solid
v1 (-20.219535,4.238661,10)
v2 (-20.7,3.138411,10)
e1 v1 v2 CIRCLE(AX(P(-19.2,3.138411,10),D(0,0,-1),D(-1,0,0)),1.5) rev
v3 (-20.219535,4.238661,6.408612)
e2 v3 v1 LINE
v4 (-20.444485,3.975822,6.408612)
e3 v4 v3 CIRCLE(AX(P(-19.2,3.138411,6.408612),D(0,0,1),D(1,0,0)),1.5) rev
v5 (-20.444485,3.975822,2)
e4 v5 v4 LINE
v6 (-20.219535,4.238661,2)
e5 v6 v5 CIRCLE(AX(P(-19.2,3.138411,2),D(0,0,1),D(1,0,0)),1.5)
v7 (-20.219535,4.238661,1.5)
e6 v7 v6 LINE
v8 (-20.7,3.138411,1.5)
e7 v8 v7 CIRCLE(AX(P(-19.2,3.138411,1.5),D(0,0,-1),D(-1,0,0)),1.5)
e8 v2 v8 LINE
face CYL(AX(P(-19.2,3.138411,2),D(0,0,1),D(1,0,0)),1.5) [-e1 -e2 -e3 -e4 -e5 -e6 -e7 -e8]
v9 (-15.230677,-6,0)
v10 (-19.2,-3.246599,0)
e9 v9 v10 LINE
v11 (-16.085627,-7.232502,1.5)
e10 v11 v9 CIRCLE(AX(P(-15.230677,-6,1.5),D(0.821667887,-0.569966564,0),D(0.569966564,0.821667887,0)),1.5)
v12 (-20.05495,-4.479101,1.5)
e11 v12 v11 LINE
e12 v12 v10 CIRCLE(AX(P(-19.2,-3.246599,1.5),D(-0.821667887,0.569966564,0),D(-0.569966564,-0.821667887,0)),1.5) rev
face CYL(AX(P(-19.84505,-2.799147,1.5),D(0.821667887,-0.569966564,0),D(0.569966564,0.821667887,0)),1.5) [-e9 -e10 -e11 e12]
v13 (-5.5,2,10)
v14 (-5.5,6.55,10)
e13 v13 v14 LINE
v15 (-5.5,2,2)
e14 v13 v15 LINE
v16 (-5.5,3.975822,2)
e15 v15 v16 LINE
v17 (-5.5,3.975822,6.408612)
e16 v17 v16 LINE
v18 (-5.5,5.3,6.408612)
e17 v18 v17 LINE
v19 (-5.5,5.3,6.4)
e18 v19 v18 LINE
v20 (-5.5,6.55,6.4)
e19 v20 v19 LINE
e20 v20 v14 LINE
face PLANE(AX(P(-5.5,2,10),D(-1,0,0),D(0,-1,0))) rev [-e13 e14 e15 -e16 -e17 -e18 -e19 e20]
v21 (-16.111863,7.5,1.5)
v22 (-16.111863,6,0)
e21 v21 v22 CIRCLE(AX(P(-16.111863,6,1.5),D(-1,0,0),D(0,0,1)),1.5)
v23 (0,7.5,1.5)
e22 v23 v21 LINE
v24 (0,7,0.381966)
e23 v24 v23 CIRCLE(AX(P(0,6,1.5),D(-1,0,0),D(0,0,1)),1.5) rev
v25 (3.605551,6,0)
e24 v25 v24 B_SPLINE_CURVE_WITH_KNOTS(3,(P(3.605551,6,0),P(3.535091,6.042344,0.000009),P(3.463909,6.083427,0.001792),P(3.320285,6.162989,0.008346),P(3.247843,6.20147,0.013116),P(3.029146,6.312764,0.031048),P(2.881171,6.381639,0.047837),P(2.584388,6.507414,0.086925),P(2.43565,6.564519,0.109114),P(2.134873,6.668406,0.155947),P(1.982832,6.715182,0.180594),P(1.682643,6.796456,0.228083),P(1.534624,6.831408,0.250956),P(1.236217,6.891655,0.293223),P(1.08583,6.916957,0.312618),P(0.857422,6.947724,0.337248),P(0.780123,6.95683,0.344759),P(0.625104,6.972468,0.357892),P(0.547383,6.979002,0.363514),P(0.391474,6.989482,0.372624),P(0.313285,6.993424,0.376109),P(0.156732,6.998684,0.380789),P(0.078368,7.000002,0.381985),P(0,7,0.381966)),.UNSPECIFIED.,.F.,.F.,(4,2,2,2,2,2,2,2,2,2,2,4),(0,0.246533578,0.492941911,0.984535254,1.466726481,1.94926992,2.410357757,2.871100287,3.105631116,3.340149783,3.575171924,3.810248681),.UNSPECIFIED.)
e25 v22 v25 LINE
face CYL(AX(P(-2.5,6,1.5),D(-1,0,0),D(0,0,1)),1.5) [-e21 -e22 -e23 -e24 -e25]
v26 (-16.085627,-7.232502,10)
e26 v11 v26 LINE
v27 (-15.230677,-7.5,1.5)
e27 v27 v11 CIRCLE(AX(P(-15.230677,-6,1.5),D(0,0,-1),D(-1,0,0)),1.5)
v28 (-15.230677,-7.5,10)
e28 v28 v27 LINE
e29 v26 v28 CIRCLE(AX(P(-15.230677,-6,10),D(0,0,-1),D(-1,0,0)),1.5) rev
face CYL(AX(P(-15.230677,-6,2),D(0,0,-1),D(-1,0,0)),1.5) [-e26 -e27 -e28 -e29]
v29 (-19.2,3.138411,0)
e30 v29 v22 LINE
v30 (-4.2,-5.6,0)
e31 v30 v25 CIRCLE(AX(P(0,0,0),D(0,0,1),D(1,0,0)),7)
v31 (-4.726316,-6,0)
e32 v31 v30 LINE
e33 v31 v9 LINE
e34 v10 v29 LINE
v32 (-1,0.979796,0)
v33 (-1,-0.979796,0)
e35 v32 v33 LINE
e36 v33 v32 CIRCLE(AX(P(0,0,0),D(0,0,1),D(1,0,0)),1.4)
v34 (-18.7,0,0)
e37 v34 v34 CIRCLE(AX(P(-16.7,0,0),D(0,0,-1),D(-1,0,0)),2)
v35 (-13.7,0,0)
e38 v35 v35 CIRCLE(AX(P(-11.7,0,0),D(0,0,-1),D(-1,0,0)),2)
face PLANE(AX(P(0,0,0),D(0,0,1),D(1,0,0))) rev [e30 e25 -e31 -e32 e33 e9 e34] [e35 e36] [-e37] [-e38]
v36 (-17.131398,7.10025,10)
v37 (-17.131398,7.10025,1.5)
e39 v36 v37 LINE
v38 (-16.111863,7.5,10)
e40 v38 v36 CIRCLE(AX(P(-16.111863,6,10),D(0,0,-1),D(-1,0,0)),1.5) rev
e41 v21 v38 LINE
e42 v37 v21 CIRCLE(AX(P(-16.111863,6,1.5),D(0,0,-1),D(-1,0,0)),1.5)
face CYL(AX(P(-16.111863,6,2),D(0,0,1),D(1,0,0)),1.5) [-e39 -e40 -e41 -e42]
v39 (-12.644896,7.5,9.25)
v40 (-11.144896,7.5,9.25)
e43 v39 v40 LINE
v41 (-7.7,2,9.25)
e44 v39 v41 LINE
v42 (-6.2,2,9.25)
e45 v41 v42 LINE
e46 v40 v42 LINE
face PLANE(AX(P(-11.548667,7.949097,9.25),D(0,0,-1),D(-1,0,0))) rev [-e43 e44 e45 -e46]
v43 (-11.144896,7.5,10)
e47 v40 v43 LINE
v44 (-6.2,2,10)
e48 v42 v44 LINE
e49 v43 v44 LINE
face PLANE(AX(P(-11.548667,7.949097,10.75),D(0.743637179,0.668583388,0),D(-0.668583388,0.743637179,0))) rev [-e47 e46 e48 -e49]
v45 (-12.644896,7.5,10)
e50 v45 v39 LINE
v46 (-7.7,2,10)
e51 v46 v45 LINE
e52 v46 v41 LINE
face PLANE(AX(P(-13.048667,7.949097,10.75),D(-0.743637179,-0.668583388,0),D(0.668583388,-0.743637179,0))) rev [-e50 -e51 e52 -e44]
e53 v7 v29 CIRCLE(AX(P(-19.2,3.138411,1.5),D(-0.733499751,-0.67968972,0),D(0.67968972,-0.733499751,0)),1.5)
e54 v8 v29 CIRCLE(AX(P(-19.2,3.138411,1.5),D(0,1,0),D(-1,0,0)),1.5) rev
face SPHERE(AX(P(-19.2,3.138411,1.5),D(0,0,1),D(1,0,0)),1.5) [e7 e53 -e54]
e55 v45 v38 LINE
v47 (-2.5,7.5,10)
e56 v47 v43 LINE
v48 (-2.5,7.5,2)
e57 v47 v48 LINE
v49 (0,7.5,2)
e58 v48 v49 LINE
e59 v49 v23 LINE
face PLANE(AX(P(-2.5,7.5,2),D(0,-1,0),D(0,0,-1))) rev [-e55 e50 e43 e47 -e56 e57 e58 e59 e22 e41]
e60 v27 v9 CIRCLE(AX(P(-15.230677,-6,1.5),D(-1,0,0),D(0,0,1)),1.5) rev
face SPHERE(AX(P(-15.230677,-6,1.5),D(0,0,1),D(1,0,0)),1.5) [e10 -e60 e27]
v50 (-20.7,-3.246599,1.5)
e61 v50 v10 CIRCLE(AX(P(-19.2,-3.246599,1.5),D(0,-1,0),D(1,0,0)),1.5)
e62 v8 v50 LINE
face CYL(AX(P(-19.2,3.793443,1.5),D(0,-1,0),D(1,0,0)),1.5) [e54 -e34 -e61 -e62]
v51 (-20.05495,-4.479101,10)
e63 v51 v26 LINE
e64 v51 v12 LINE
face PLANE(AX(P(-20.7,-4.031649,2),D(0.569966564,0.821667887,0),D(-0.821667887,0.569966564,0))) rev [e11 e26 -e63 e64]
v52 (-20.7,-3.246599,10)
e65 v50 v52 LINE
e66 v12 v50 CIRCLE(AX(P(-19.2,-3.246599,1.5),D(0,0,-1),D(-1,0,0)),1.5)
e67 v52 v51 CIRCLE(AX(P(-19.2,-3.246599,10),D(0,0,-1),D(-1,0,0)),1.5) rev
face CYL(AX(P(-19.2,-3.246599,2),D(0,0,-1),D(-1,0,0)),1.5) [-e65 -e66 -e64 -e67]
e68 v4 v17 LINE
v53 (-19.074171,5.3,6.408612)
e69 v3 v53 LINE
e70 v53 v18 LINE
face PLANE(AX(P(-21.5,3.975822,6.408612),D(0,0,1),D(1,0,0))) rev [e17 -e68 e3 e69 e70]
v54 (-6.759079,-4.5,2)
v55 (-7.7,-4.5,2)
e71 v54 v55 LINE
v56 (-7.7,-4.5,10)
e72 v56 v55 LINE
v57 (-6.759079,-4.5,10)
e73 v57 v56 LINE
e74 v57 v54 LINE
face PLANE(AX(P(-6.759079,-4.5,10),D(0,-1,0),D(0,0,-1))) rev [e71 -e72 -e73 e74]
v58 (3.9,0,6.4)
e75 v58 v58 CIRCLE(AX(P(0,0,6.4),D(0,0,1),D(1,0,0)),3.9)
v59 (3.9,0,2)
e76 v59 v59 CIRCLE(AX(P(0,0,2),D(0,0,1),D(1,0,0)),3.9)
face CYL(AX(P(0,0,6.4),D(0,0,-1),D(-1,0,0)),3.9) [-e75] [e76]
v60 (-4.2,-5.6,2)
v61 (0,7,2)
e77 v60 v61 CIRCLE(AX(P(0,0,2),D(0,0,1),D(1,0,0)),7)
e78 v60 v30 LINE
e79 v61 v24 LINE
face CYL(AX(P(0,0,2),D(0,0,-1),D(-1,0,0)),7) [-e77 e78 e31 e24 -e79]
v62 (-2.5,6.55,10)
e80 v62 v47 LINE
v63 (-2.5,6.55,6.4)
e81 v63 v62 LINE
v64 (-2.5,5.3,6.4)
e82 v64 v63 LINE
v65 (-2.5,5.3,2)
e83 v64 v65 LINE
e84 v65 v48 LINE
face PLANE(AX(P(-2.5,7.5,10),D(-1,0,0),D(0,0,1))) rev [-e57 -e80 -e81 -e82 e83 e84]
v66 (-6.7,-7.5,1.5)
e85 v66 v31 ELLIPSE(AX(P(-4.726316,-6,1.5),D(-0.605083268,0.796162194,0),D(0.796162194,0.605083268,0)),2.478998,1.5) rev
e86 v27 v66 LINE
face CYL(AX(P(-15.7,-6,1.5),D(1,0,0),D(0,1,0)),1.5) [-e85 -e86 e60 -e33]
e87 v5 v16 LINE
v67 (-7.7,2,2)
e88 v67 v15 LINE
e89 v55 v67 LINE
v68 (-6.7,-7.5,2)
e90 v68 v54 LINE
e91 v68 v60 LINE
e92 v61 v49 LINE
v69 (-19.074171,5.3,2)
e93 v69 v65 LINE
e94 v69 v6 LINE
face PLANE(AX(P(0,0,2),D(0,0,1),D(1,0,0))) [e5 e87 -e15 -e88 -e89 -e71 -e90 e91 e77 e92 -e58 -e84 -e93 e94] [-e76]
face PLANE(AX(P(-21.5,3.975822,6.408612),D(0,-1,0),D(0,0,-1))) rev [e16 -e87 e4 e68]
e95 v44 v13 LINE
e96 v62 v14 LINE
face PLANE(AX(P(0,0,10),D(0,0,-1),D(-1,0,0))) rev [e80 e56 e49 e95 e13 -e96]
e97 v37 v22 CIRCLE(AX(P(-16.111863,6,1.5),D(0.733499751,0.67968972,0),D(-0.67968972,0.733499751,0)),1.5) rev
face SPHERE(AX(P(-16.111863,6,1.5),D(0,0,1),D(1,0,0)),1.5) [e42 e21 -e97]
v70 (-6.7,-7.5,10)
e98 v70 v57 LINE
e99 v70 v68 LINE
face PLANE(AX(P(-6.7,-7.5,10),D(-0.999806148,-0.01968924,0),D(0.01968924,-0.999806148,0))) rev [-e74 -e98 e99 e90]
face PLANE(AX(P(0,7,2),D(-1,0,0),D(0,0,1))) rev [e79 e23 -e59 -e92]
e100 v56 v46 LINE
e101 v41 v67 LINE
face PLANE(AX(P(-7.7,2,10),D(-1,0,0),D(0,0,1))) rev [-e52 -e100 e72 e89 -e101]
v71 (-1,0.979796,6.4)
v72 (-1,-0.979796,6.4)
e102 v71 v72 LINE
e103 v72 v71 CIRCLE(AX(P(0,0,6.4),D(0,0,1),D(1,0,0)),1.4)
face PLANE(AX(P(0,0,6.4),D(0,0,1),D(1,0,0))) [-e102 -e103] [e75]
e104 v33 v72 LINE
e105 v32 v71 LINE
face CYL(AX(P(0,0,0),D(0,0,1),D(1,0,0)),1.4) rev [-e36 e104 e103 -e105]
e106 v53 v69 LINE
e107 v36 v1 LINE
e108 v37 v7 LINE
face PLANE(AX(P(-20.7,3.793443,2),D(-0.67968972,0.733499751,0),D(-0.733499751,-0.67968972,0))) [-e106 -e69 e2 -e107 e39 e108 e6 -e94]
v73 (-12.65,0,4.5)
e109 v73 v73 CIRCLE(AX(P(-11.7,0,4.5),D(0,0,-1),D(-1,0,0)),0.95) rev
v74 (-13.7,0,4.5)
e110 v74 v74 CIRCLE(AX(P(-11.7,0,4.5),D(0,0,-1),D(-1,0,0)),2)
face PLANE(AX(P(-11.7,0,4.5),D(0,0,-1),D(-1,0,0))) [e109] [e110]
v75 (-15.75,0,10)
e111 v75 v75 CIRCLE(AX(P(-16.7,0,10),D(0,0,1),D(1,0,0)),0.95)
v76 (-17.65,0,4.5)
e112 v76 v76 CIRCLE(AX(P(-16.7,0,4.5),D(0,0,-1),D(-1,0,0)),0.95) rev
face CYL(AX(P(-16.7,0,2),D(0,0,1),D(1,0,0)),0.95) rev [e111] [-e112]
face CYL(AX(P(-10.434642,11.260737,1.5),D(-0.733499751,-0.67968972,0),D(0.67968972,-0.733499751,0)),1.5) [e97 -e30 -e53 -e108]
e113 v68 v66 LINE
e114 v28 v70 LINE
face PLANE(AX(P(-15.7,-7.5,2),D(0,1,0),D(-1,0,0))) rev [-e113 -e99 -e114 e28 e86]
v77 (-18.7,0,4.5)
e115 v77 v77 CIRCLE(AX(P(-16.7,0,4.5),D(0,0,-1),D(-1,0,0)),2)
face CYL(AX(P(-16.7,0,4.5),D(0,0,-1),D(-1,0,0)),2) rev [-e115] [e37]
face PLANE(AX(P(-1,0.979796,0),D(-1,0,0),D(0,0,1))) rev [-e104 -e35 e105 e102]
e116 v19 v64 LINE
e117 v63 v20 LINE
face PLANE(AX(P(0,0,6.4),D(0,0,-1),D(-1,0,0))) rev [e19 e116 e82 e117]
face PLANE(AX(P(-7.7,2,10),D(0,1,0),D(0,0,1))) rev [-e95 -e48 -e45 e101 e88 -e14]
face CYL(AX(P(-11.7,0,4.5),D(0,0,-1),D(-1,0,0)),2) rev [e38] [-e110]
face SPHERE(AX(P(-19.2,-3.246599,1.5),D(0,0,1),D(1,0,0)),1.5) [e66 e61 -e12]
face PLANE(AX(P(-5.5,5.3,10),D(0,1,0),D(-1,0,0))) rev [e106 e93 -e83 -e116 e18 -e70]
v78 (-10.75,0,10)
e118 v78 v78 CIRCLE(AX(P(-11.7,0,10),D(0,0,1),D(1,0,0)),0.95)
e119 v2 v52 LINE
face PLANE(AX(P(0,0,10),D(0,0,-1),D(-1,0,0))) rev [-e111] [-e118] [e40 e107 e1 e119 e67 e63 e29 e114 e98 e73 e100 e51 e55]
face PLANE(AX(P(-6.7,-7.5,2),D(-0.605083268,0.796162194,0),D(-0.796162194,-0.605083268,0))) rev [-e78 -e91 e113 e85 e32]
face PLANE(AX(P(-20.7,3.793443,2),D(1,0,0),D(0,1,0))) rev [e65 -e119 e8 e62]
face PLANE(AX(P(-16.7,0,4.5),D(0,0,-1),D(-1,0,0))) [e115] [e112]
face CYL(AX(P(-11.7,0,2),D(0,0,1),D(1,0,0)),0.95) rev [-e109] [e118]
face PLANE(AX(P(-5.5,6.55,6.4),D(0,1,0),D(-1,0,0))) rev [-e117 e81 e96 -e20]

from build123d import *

# Parameters (mm, degrees)
BOSS_EXTRUDE1_DEPTH = 2
BOSS_EXTRUDE2_DEPTH = 8
SKETCH24_R          = 3.9
BOSS_EXTRUDE5_DEPTH = 4.4
SKETCH30_W          = 4.40861202
SKETCH30_H          = 1.324178481
CUT_EXTRUDE12_DEPTH = 16
CUT_EXTRUDE11_DEPTH = 23.928148639
FILLET1_R           = 1.5
SKETCH34_W          = 1.5
SKETCH34_H          = 1.5
CUT_EXTRUDE13_DEPTH = 8
SKETCH36_R          = 0.95
CUT_EXTRUDE15_DEPTH = 8
SKETCH37_R          = 2
CUT_EXTRUDE16_DEPTH = 4.5
SKETCH38_W          = 3
SKETCH38_H          = 1.25
CUT_EXTRUDE17_DEPTH = 3.6


with BuildPart() as part:
    # Sketch2 → Boss-Extrude1 (new body)
    with BuildSketch(Plane.XY):
        with BuildLine():
            Line((-2.5, 7.5), (-16.7, 7.5))
            Line((-16.7, 7.5), (-20.7, 3.793442666))
            Line((-20.7, 3.793442666), (-20.7, -4.031648778))
            Line((-20.7, -4.031648778), (-15.7, -7.5))
            Line((-15.7, -7.5), (-6.7, -7.5))
            Line((-6.7, -7.5), (-4.2, -5.6))
            ThreePointArc((-4.2, -5.6), (3.130495168, -6.260990337), (7, 0))
            ThreePointArc((7, 0), (4.949747468, 4.949747468), (0, 7))
            Line((0, 7), (0, 7.5))
            Line((0, 7.5), (-2.5, 7.5))
        make_face()
    extrude(amount=BOSS_EXTRUDE1_DEPTH)

    # Sketch4 → Boss-Extrude2 (add)
    with BuildSketch(Plane.XY.offset(2)):
        Polygon((-15.7, -7.5), (-6.7, -7.5), (-6.759079174, -4.5), (-7.7, -4.5), (-7.7, 2), (-5.5, 2), (-5.5, 5.3), (-2.5, 5.3), (-2.5, 7.5), (-16.7, 7.5), (-20.7, 3.793442666), (-20.7, -4.031648778), align=None)
    extrude(amount=BOSS_EXTRUDE2_DEPTH)

    # Sketch24 → Boss-Extrude5 (add)
    with BuildSketch(Plane.XY.offset(2)):
        Circle(SKETCH24_R)
    extrude(amount=BOSS_EXTRUDE5_DEPTH)

    # Sketch30 → Cut-Extrude12 (cut)
    with BuildSketch(Plane(origin=(-5.5, 0, 0), x_dir=(0, 0, -1), z_dir=(1, 0, 0))):
        with Locations((-4.20430601, 4.63791076)):
            Rectangle(SKETCH30_W, SKETCH30_H)
    extrude(amount=-CUT_EXTRUDE12_DEPTH, mode=Mode.SUBTRACT)

    # Sketch28 → Cut-Extrude11 (cut, through all)
    with BuildSketch(Plane.XY.offset(6.4)):
        with BuildLine():
            Line((-1, 0.979795897), (-1, -0.979795897))
            ThreePointArc((-1, -0.979795897), (1.4, 0), (-1, 0.979795897))
        make_face()
    extrude(amount=-CUT_EXTRUDE11_DEPTH, mode=Mode.SUBTRACT)

    # Fillet1
    # the kernel refuses this fillet: 1.5 mm, written as the material it takes off along each edge
    with BuildSketch(Plane(origin=(-15.230677435, -6, 1.5), x_dir=(-0.5699665637840448, -0.8216678867816415, 0), z_dir=(0, 0, -1))) as fillet1_piece_1_section:
        Polygon((0, 0), (FILLET1_R * 1.02, 0), (FILLET1_R * 1.02, -FILLET1_R * 0.319139344377), (FILLET1_R * 0.838101244517, -FILLET1_R * 0.58136589506), align=None)
    fillet1_piece_1 = extrude(amount=FILLET1_R * 1.02, mode=Mode.PRIVATE)
    fillet1_piece_1 = fillet1_piece_1 - Plane(origin=(-15.230677435, -6, 1.5), x_dir=(0.29860685961507855, 0.9543762064253388, 0), z_dir=(0, 0, -1)) * Sphere(FILLET1_R, mode=Mode.PRIVATE)
    add(fillet1_piece_1, mode=Mode.SUBTRACT)
    with BuildSketch(Plane(origin=(-16.11186344, 6, 1.5), x_dir=(-0.6796897201843015, 0.7334997506991983, 0), z_dir=(0, 0, -1))) as fillet1_piece_2_section:
        Polygon((0, 0), (FILLET1_R * 1.02, 0), (FILLET1_R * 1.02, FILLET1_R * 0.399932860855), (FILLET1_R * 0.748169745713, FILLET1_R * 0.693283514588), align=None)
    fillet1_piece_2 = extrude(amount=FILLET1_R * 1.02, mode=Mode.PRIVATE)
    fillet1_piece_2 = fillet1_piece_2 - Plane(origin=(-16.11186344, 6, 1.5), x_dir=(0.3650344157067945, -0.9309940254102596, 0), z_dir=(0, 0, -1)) * Sphere(FILLET1_R, mode=Mode.PRIVATE)
    add(fillet1_piece_2, mode=Mode.SUBTRACT)
    with BuildSketch(Plane(origin=(-19.2, 3.138411196, 1.5), x_dir=(-0.6796897201843015, 0.7334997506991983, 0), z_dir=(0, 0, -1))) as fillet1_piece_3_section:
        Polygon((0, 0), (FILLET1_R * 1.02, 0), (FILLET1_R * 1.02, -FILLET1_R * 0.445421399395), (FILLET1_R * 0.693283514588, -FILLET1_R * 0.748169745713), align=None)
    fillet1_piece_3 = extrude(amount=FILLET1_R * 1.02, mode=Mode.PRIVATE)
    fillet1_piece_3 = fillet1_piece_3 - Plane(origin=(-19.2, 3.138411196, 1.5), x_dir=(0.9164304993244992, -0.40019387789901173, 0), z_dir=(0, 0, -1)) * Sphere(FILLET1_R, mode=Mode.PRIVATE)
    add(fillet1_piece_3, mode=Mode.SUBTRACT)
    with BuildSketch(Plane(origin=(-19.2, -3.246599046, 1.5), x_dir=(-0.5699665637840448, -0.8216678867816415, 0), z_dir=(0, 0, -1))) as fillet1_piece_4_section:
        Polygon((0, 0), (FILLET1_R * 1.02, 0), (FILLET1_R * 1.02, FILLET1_R * 0.533833817771), (FILLET1_R * 0.58136589506, FILLET1_R * 0.838101244517), align=None)
    fillet1_piece_4 = extrude(amount=FILLET1_R * 1.02, mode=Mode.PRIVATE)
    fillet1_piece_4 = fillet1_piece_4 - Plane(origin=(-19.2, -3.246599046, 1.5), x_dir=(0.8859928227090906, 0.46369895202380795, 0), z_dir=(0, 0, -1)) * Sphere(FILLET1_R, mode=Mode.PRIVATE)
    add(fillet1_piece_4, mode=Mode.SUBTRACT)
    with BuildSketch(Plane(origin=(-15.230677435, -7.5, 0), x_dir=(0, 1, 0), z_dir=(1, 0, 0))) as fillet1_piece_5_section:
        with BuildLine():
            CenterArc((FILLET1_R, FILLET1_R), FILLET1_R, 180, 90)
            Line((0, FILLET1_R), (0, 0))
            Line((0, 0), (FILLET1_R, 0))
        make_face()
    fillet1_piece_5 = extrude(amount=12.280677435, mode=Mode.PRIVATE)
    fillet1_piece_5 = split(fillet1_piece_5, bisect_by=Plane(origin=(-9.092127217, -9.318016685, 0.3282266), z_dir=(-0.6050832675335577, 0.7961621941231027, 0)), keep=Keep.TOP, mode=Mode.PRIVATE)
    add(fillet1_piece_5, mode=Mode.SUBTRACT)
    with BuildSketch(Plane(origin=(3.75, 7.5, 0), x_dir=(0, 0, 1), z_dir=(-1, 0, 0))) as fillet1_piece_6:
        with BuildLine():
            CenterArc((FILLET1_R, -FILLET1_R), FILLET1_R, 90, 90)
            Line((0, -FILLET1_R), (0, 0))
            Line((0, 0), (FILLET1_R, 0))
        make_face()
    extrude(amount=19.86186344, mode=Mode.SUBTRACT)
    with BuildSketch(Plane(origin=(-17.13139802, 7.100249626, 0), x_dir=(0.6796897201843014, -0.7334997506991981, 0), z_dir=(-0.7334997506991983, -0.6796897201843015, 0))) as fillet1_piece_7:
        with BuildLine():
            CenterArc((FILLET1_R, FILLET1_R), FILLET1_R, 180, 90)
            Line((0, FILLET1_R), (0, 0))
            Line((0, 0), (FILLET1_R, 0))
        make_face()
    extrude(amount=4.21013989, mode=Mode.SUBTRACT)
    with BuildSketch(Plane(origin=(-20.054949846, -4.479100876, 0), x_dir=(0.5699665637840448, 0.8216678867816416, 0), z_dir=(0.8216678867816415, -0.5699665637840448, 0))) as fillet1_piece_8:
        with BuildLine():
            CenterArc((FILLET1_R, FILLET1_R), FILLET1_R, 180, 90)
            Line((0, FILLET1_R), (0, 0))
            Line((0, 0), (FILLET1_R, 0))
        make_face()
    extrude(amount=4.830811364, mode=Mode.SUBTRACT)
    with BuildSketch(Plane(origin=(-20.7, 3.138411196, 0), x_dir=(1, 0, 0), z_dir=(0, -1, 0))) as fillet1_piece_9:
        with BuildLine():
            CenterArc((FILLET1_R, FILLET1_R), FILLET1_R, 180, 90)
            Line((0, FILLET1_R), (0, 0))
            Line((0, 0), (FILLET1_R, 0))
        make_face()
    extrude(amount=6.385010242, mode=Mode.SUBTRACT)
    with BuildSketch(Plane(origin=(-15.7, -7.5, 1.5), x_dir=(1, 0, 0), z_dir=(0, 0, 1))) as fillet1_piece_10:
        with BuildLine():
            CenterArc((FILLET1_R * 0.312881710173, FILLET1_R), FILLET1_R, 235.252105822, 34.747894178)
            Line((-FILLET1_R * 0.257084853611, FILLET1_R * 0.178332113218), (0, 0))
            Line((0, 0), (FILLET1_R * 0.312881710173, 0))
        make_face()
    extrude(amount=9.673306413, mode=Mode.SUBTRACT)
    with BuildSketch(Plane(origin=(-20.7, -4.031648778, 1.5), x_dir=(0, 1, 0), z_dir=(0, 0, 1))) as fillet1_piece_11:
        with BuildLine():
            CenterArc((FILLET1_R * 0.523366488011, -FILLET1_R), FILLET1_R, 90, 55.252105822)
            Line((-FILLET1_R * 0.298301398771, -FILLET1_R * 0.430033436216), (0, 0))
            Line((0, 0), (FILLET1_R * 0.523366488011, 0))
        make_face()
    extrude(amount=10.46262433, mode=Mode.SUBTRACT)
    with BuildSketch(Plane(origin=(-20.7, 3.793442666, 1.5), x_dir=(0.7334997506991984, 0.6796897201843014, 0), z_dir=(0, 0, 1))) as fillet1_piece_12:
        with BuildLine():
            CenterArc((FILLET1_R * 0.436687646465, -FILLET1_R), FILLET1_R, 90, 47.18059856)
            Line((-FILLET1_R * 0.296812104234, -FILLET1_R * 0.320310279816), (0, 0))
            Line((0, 0), (FILLET1_R * 0.436687646465, 0))
        make_face()
    extrude(amount=10.137578674, mode=Mode.SUBTRACT)
    with BuildSketch(Plane(origin=(-16.7, 7.5, 1.5), x_dir=(1, 0, 0), z_dir=(0, 0, 1))) as fillet1_piece_13:
        with BuildLine():
            CenterArc((FILLET1_R * 0.392091040054, -FILLET1_R), FILLET1_R, 90, 42.81940144)
            Line((-FILLET1_R * 0.287598680131, -FILLET1_R * 0.266500249301), (0, 0))
            Line((0, 0), (FILLET1_R * 0.392091040054, 0))
        make_face()
    extrude(amount=9.9703414, mode=Mode.SUBTRACT)

    # Sketch34 → Cut-Extrude13 (cut, along a direction that is not the sketch's normal)
    with BuildSketch(Plane.XZ.offset(-2)):
        with Locations((-6.95, 10)):
            Rectangle(SKETCH34_W, SKETCH34_H)
    extrude(amount=-CUT_EXTRUDE13_DEPTH, dir=(0.6685833876565112, -0.7436371788377336, 0), mode=Mode.SUBTRACT)

    # Sketch36 → Cut-Extrude15 (cut)
    with BuildSketch(Plane.XY.offset(10)):
        with Locations((-11.7, 0)):
            Circle(SKETCH36_R)
        with Locations((-16.7, 0)):
            Circle(SKETCH36_R)
    extrude(amount=-CUT_EXTRUDE15_DEPTH, mode=Mode.SUBTRACT)

    # Sketch37 → Cut-Extrude16 (cut)
    with BuildSketch(Plane(origin=(0, 0, 0), x_dir=(-1, 0, 0), z_dir=(0, 0, -1))):
        with Locations((11.7, 0)):
            Circle(SKETCH37_R)
        with Locations((16.7, 0)):
            Circle(SKETCH37_R)
    extrude(amount=-CUT_EXTRUDE16_DEPTH, mode=Mode.SUBTRACT)

    # Sketch38 → Cut-Extrude17 (cut)
    with BuildSketch(Plane.XY.offset(10)):
        with Locations((-4, 5.925)):
            Rectangle(SKETCH38_W, SKETCH38_H)
    extrude(amount=-CUT_EXTRUDE17_DEPTH, mode=Mode.SUBTRACT)


solid = part.part
